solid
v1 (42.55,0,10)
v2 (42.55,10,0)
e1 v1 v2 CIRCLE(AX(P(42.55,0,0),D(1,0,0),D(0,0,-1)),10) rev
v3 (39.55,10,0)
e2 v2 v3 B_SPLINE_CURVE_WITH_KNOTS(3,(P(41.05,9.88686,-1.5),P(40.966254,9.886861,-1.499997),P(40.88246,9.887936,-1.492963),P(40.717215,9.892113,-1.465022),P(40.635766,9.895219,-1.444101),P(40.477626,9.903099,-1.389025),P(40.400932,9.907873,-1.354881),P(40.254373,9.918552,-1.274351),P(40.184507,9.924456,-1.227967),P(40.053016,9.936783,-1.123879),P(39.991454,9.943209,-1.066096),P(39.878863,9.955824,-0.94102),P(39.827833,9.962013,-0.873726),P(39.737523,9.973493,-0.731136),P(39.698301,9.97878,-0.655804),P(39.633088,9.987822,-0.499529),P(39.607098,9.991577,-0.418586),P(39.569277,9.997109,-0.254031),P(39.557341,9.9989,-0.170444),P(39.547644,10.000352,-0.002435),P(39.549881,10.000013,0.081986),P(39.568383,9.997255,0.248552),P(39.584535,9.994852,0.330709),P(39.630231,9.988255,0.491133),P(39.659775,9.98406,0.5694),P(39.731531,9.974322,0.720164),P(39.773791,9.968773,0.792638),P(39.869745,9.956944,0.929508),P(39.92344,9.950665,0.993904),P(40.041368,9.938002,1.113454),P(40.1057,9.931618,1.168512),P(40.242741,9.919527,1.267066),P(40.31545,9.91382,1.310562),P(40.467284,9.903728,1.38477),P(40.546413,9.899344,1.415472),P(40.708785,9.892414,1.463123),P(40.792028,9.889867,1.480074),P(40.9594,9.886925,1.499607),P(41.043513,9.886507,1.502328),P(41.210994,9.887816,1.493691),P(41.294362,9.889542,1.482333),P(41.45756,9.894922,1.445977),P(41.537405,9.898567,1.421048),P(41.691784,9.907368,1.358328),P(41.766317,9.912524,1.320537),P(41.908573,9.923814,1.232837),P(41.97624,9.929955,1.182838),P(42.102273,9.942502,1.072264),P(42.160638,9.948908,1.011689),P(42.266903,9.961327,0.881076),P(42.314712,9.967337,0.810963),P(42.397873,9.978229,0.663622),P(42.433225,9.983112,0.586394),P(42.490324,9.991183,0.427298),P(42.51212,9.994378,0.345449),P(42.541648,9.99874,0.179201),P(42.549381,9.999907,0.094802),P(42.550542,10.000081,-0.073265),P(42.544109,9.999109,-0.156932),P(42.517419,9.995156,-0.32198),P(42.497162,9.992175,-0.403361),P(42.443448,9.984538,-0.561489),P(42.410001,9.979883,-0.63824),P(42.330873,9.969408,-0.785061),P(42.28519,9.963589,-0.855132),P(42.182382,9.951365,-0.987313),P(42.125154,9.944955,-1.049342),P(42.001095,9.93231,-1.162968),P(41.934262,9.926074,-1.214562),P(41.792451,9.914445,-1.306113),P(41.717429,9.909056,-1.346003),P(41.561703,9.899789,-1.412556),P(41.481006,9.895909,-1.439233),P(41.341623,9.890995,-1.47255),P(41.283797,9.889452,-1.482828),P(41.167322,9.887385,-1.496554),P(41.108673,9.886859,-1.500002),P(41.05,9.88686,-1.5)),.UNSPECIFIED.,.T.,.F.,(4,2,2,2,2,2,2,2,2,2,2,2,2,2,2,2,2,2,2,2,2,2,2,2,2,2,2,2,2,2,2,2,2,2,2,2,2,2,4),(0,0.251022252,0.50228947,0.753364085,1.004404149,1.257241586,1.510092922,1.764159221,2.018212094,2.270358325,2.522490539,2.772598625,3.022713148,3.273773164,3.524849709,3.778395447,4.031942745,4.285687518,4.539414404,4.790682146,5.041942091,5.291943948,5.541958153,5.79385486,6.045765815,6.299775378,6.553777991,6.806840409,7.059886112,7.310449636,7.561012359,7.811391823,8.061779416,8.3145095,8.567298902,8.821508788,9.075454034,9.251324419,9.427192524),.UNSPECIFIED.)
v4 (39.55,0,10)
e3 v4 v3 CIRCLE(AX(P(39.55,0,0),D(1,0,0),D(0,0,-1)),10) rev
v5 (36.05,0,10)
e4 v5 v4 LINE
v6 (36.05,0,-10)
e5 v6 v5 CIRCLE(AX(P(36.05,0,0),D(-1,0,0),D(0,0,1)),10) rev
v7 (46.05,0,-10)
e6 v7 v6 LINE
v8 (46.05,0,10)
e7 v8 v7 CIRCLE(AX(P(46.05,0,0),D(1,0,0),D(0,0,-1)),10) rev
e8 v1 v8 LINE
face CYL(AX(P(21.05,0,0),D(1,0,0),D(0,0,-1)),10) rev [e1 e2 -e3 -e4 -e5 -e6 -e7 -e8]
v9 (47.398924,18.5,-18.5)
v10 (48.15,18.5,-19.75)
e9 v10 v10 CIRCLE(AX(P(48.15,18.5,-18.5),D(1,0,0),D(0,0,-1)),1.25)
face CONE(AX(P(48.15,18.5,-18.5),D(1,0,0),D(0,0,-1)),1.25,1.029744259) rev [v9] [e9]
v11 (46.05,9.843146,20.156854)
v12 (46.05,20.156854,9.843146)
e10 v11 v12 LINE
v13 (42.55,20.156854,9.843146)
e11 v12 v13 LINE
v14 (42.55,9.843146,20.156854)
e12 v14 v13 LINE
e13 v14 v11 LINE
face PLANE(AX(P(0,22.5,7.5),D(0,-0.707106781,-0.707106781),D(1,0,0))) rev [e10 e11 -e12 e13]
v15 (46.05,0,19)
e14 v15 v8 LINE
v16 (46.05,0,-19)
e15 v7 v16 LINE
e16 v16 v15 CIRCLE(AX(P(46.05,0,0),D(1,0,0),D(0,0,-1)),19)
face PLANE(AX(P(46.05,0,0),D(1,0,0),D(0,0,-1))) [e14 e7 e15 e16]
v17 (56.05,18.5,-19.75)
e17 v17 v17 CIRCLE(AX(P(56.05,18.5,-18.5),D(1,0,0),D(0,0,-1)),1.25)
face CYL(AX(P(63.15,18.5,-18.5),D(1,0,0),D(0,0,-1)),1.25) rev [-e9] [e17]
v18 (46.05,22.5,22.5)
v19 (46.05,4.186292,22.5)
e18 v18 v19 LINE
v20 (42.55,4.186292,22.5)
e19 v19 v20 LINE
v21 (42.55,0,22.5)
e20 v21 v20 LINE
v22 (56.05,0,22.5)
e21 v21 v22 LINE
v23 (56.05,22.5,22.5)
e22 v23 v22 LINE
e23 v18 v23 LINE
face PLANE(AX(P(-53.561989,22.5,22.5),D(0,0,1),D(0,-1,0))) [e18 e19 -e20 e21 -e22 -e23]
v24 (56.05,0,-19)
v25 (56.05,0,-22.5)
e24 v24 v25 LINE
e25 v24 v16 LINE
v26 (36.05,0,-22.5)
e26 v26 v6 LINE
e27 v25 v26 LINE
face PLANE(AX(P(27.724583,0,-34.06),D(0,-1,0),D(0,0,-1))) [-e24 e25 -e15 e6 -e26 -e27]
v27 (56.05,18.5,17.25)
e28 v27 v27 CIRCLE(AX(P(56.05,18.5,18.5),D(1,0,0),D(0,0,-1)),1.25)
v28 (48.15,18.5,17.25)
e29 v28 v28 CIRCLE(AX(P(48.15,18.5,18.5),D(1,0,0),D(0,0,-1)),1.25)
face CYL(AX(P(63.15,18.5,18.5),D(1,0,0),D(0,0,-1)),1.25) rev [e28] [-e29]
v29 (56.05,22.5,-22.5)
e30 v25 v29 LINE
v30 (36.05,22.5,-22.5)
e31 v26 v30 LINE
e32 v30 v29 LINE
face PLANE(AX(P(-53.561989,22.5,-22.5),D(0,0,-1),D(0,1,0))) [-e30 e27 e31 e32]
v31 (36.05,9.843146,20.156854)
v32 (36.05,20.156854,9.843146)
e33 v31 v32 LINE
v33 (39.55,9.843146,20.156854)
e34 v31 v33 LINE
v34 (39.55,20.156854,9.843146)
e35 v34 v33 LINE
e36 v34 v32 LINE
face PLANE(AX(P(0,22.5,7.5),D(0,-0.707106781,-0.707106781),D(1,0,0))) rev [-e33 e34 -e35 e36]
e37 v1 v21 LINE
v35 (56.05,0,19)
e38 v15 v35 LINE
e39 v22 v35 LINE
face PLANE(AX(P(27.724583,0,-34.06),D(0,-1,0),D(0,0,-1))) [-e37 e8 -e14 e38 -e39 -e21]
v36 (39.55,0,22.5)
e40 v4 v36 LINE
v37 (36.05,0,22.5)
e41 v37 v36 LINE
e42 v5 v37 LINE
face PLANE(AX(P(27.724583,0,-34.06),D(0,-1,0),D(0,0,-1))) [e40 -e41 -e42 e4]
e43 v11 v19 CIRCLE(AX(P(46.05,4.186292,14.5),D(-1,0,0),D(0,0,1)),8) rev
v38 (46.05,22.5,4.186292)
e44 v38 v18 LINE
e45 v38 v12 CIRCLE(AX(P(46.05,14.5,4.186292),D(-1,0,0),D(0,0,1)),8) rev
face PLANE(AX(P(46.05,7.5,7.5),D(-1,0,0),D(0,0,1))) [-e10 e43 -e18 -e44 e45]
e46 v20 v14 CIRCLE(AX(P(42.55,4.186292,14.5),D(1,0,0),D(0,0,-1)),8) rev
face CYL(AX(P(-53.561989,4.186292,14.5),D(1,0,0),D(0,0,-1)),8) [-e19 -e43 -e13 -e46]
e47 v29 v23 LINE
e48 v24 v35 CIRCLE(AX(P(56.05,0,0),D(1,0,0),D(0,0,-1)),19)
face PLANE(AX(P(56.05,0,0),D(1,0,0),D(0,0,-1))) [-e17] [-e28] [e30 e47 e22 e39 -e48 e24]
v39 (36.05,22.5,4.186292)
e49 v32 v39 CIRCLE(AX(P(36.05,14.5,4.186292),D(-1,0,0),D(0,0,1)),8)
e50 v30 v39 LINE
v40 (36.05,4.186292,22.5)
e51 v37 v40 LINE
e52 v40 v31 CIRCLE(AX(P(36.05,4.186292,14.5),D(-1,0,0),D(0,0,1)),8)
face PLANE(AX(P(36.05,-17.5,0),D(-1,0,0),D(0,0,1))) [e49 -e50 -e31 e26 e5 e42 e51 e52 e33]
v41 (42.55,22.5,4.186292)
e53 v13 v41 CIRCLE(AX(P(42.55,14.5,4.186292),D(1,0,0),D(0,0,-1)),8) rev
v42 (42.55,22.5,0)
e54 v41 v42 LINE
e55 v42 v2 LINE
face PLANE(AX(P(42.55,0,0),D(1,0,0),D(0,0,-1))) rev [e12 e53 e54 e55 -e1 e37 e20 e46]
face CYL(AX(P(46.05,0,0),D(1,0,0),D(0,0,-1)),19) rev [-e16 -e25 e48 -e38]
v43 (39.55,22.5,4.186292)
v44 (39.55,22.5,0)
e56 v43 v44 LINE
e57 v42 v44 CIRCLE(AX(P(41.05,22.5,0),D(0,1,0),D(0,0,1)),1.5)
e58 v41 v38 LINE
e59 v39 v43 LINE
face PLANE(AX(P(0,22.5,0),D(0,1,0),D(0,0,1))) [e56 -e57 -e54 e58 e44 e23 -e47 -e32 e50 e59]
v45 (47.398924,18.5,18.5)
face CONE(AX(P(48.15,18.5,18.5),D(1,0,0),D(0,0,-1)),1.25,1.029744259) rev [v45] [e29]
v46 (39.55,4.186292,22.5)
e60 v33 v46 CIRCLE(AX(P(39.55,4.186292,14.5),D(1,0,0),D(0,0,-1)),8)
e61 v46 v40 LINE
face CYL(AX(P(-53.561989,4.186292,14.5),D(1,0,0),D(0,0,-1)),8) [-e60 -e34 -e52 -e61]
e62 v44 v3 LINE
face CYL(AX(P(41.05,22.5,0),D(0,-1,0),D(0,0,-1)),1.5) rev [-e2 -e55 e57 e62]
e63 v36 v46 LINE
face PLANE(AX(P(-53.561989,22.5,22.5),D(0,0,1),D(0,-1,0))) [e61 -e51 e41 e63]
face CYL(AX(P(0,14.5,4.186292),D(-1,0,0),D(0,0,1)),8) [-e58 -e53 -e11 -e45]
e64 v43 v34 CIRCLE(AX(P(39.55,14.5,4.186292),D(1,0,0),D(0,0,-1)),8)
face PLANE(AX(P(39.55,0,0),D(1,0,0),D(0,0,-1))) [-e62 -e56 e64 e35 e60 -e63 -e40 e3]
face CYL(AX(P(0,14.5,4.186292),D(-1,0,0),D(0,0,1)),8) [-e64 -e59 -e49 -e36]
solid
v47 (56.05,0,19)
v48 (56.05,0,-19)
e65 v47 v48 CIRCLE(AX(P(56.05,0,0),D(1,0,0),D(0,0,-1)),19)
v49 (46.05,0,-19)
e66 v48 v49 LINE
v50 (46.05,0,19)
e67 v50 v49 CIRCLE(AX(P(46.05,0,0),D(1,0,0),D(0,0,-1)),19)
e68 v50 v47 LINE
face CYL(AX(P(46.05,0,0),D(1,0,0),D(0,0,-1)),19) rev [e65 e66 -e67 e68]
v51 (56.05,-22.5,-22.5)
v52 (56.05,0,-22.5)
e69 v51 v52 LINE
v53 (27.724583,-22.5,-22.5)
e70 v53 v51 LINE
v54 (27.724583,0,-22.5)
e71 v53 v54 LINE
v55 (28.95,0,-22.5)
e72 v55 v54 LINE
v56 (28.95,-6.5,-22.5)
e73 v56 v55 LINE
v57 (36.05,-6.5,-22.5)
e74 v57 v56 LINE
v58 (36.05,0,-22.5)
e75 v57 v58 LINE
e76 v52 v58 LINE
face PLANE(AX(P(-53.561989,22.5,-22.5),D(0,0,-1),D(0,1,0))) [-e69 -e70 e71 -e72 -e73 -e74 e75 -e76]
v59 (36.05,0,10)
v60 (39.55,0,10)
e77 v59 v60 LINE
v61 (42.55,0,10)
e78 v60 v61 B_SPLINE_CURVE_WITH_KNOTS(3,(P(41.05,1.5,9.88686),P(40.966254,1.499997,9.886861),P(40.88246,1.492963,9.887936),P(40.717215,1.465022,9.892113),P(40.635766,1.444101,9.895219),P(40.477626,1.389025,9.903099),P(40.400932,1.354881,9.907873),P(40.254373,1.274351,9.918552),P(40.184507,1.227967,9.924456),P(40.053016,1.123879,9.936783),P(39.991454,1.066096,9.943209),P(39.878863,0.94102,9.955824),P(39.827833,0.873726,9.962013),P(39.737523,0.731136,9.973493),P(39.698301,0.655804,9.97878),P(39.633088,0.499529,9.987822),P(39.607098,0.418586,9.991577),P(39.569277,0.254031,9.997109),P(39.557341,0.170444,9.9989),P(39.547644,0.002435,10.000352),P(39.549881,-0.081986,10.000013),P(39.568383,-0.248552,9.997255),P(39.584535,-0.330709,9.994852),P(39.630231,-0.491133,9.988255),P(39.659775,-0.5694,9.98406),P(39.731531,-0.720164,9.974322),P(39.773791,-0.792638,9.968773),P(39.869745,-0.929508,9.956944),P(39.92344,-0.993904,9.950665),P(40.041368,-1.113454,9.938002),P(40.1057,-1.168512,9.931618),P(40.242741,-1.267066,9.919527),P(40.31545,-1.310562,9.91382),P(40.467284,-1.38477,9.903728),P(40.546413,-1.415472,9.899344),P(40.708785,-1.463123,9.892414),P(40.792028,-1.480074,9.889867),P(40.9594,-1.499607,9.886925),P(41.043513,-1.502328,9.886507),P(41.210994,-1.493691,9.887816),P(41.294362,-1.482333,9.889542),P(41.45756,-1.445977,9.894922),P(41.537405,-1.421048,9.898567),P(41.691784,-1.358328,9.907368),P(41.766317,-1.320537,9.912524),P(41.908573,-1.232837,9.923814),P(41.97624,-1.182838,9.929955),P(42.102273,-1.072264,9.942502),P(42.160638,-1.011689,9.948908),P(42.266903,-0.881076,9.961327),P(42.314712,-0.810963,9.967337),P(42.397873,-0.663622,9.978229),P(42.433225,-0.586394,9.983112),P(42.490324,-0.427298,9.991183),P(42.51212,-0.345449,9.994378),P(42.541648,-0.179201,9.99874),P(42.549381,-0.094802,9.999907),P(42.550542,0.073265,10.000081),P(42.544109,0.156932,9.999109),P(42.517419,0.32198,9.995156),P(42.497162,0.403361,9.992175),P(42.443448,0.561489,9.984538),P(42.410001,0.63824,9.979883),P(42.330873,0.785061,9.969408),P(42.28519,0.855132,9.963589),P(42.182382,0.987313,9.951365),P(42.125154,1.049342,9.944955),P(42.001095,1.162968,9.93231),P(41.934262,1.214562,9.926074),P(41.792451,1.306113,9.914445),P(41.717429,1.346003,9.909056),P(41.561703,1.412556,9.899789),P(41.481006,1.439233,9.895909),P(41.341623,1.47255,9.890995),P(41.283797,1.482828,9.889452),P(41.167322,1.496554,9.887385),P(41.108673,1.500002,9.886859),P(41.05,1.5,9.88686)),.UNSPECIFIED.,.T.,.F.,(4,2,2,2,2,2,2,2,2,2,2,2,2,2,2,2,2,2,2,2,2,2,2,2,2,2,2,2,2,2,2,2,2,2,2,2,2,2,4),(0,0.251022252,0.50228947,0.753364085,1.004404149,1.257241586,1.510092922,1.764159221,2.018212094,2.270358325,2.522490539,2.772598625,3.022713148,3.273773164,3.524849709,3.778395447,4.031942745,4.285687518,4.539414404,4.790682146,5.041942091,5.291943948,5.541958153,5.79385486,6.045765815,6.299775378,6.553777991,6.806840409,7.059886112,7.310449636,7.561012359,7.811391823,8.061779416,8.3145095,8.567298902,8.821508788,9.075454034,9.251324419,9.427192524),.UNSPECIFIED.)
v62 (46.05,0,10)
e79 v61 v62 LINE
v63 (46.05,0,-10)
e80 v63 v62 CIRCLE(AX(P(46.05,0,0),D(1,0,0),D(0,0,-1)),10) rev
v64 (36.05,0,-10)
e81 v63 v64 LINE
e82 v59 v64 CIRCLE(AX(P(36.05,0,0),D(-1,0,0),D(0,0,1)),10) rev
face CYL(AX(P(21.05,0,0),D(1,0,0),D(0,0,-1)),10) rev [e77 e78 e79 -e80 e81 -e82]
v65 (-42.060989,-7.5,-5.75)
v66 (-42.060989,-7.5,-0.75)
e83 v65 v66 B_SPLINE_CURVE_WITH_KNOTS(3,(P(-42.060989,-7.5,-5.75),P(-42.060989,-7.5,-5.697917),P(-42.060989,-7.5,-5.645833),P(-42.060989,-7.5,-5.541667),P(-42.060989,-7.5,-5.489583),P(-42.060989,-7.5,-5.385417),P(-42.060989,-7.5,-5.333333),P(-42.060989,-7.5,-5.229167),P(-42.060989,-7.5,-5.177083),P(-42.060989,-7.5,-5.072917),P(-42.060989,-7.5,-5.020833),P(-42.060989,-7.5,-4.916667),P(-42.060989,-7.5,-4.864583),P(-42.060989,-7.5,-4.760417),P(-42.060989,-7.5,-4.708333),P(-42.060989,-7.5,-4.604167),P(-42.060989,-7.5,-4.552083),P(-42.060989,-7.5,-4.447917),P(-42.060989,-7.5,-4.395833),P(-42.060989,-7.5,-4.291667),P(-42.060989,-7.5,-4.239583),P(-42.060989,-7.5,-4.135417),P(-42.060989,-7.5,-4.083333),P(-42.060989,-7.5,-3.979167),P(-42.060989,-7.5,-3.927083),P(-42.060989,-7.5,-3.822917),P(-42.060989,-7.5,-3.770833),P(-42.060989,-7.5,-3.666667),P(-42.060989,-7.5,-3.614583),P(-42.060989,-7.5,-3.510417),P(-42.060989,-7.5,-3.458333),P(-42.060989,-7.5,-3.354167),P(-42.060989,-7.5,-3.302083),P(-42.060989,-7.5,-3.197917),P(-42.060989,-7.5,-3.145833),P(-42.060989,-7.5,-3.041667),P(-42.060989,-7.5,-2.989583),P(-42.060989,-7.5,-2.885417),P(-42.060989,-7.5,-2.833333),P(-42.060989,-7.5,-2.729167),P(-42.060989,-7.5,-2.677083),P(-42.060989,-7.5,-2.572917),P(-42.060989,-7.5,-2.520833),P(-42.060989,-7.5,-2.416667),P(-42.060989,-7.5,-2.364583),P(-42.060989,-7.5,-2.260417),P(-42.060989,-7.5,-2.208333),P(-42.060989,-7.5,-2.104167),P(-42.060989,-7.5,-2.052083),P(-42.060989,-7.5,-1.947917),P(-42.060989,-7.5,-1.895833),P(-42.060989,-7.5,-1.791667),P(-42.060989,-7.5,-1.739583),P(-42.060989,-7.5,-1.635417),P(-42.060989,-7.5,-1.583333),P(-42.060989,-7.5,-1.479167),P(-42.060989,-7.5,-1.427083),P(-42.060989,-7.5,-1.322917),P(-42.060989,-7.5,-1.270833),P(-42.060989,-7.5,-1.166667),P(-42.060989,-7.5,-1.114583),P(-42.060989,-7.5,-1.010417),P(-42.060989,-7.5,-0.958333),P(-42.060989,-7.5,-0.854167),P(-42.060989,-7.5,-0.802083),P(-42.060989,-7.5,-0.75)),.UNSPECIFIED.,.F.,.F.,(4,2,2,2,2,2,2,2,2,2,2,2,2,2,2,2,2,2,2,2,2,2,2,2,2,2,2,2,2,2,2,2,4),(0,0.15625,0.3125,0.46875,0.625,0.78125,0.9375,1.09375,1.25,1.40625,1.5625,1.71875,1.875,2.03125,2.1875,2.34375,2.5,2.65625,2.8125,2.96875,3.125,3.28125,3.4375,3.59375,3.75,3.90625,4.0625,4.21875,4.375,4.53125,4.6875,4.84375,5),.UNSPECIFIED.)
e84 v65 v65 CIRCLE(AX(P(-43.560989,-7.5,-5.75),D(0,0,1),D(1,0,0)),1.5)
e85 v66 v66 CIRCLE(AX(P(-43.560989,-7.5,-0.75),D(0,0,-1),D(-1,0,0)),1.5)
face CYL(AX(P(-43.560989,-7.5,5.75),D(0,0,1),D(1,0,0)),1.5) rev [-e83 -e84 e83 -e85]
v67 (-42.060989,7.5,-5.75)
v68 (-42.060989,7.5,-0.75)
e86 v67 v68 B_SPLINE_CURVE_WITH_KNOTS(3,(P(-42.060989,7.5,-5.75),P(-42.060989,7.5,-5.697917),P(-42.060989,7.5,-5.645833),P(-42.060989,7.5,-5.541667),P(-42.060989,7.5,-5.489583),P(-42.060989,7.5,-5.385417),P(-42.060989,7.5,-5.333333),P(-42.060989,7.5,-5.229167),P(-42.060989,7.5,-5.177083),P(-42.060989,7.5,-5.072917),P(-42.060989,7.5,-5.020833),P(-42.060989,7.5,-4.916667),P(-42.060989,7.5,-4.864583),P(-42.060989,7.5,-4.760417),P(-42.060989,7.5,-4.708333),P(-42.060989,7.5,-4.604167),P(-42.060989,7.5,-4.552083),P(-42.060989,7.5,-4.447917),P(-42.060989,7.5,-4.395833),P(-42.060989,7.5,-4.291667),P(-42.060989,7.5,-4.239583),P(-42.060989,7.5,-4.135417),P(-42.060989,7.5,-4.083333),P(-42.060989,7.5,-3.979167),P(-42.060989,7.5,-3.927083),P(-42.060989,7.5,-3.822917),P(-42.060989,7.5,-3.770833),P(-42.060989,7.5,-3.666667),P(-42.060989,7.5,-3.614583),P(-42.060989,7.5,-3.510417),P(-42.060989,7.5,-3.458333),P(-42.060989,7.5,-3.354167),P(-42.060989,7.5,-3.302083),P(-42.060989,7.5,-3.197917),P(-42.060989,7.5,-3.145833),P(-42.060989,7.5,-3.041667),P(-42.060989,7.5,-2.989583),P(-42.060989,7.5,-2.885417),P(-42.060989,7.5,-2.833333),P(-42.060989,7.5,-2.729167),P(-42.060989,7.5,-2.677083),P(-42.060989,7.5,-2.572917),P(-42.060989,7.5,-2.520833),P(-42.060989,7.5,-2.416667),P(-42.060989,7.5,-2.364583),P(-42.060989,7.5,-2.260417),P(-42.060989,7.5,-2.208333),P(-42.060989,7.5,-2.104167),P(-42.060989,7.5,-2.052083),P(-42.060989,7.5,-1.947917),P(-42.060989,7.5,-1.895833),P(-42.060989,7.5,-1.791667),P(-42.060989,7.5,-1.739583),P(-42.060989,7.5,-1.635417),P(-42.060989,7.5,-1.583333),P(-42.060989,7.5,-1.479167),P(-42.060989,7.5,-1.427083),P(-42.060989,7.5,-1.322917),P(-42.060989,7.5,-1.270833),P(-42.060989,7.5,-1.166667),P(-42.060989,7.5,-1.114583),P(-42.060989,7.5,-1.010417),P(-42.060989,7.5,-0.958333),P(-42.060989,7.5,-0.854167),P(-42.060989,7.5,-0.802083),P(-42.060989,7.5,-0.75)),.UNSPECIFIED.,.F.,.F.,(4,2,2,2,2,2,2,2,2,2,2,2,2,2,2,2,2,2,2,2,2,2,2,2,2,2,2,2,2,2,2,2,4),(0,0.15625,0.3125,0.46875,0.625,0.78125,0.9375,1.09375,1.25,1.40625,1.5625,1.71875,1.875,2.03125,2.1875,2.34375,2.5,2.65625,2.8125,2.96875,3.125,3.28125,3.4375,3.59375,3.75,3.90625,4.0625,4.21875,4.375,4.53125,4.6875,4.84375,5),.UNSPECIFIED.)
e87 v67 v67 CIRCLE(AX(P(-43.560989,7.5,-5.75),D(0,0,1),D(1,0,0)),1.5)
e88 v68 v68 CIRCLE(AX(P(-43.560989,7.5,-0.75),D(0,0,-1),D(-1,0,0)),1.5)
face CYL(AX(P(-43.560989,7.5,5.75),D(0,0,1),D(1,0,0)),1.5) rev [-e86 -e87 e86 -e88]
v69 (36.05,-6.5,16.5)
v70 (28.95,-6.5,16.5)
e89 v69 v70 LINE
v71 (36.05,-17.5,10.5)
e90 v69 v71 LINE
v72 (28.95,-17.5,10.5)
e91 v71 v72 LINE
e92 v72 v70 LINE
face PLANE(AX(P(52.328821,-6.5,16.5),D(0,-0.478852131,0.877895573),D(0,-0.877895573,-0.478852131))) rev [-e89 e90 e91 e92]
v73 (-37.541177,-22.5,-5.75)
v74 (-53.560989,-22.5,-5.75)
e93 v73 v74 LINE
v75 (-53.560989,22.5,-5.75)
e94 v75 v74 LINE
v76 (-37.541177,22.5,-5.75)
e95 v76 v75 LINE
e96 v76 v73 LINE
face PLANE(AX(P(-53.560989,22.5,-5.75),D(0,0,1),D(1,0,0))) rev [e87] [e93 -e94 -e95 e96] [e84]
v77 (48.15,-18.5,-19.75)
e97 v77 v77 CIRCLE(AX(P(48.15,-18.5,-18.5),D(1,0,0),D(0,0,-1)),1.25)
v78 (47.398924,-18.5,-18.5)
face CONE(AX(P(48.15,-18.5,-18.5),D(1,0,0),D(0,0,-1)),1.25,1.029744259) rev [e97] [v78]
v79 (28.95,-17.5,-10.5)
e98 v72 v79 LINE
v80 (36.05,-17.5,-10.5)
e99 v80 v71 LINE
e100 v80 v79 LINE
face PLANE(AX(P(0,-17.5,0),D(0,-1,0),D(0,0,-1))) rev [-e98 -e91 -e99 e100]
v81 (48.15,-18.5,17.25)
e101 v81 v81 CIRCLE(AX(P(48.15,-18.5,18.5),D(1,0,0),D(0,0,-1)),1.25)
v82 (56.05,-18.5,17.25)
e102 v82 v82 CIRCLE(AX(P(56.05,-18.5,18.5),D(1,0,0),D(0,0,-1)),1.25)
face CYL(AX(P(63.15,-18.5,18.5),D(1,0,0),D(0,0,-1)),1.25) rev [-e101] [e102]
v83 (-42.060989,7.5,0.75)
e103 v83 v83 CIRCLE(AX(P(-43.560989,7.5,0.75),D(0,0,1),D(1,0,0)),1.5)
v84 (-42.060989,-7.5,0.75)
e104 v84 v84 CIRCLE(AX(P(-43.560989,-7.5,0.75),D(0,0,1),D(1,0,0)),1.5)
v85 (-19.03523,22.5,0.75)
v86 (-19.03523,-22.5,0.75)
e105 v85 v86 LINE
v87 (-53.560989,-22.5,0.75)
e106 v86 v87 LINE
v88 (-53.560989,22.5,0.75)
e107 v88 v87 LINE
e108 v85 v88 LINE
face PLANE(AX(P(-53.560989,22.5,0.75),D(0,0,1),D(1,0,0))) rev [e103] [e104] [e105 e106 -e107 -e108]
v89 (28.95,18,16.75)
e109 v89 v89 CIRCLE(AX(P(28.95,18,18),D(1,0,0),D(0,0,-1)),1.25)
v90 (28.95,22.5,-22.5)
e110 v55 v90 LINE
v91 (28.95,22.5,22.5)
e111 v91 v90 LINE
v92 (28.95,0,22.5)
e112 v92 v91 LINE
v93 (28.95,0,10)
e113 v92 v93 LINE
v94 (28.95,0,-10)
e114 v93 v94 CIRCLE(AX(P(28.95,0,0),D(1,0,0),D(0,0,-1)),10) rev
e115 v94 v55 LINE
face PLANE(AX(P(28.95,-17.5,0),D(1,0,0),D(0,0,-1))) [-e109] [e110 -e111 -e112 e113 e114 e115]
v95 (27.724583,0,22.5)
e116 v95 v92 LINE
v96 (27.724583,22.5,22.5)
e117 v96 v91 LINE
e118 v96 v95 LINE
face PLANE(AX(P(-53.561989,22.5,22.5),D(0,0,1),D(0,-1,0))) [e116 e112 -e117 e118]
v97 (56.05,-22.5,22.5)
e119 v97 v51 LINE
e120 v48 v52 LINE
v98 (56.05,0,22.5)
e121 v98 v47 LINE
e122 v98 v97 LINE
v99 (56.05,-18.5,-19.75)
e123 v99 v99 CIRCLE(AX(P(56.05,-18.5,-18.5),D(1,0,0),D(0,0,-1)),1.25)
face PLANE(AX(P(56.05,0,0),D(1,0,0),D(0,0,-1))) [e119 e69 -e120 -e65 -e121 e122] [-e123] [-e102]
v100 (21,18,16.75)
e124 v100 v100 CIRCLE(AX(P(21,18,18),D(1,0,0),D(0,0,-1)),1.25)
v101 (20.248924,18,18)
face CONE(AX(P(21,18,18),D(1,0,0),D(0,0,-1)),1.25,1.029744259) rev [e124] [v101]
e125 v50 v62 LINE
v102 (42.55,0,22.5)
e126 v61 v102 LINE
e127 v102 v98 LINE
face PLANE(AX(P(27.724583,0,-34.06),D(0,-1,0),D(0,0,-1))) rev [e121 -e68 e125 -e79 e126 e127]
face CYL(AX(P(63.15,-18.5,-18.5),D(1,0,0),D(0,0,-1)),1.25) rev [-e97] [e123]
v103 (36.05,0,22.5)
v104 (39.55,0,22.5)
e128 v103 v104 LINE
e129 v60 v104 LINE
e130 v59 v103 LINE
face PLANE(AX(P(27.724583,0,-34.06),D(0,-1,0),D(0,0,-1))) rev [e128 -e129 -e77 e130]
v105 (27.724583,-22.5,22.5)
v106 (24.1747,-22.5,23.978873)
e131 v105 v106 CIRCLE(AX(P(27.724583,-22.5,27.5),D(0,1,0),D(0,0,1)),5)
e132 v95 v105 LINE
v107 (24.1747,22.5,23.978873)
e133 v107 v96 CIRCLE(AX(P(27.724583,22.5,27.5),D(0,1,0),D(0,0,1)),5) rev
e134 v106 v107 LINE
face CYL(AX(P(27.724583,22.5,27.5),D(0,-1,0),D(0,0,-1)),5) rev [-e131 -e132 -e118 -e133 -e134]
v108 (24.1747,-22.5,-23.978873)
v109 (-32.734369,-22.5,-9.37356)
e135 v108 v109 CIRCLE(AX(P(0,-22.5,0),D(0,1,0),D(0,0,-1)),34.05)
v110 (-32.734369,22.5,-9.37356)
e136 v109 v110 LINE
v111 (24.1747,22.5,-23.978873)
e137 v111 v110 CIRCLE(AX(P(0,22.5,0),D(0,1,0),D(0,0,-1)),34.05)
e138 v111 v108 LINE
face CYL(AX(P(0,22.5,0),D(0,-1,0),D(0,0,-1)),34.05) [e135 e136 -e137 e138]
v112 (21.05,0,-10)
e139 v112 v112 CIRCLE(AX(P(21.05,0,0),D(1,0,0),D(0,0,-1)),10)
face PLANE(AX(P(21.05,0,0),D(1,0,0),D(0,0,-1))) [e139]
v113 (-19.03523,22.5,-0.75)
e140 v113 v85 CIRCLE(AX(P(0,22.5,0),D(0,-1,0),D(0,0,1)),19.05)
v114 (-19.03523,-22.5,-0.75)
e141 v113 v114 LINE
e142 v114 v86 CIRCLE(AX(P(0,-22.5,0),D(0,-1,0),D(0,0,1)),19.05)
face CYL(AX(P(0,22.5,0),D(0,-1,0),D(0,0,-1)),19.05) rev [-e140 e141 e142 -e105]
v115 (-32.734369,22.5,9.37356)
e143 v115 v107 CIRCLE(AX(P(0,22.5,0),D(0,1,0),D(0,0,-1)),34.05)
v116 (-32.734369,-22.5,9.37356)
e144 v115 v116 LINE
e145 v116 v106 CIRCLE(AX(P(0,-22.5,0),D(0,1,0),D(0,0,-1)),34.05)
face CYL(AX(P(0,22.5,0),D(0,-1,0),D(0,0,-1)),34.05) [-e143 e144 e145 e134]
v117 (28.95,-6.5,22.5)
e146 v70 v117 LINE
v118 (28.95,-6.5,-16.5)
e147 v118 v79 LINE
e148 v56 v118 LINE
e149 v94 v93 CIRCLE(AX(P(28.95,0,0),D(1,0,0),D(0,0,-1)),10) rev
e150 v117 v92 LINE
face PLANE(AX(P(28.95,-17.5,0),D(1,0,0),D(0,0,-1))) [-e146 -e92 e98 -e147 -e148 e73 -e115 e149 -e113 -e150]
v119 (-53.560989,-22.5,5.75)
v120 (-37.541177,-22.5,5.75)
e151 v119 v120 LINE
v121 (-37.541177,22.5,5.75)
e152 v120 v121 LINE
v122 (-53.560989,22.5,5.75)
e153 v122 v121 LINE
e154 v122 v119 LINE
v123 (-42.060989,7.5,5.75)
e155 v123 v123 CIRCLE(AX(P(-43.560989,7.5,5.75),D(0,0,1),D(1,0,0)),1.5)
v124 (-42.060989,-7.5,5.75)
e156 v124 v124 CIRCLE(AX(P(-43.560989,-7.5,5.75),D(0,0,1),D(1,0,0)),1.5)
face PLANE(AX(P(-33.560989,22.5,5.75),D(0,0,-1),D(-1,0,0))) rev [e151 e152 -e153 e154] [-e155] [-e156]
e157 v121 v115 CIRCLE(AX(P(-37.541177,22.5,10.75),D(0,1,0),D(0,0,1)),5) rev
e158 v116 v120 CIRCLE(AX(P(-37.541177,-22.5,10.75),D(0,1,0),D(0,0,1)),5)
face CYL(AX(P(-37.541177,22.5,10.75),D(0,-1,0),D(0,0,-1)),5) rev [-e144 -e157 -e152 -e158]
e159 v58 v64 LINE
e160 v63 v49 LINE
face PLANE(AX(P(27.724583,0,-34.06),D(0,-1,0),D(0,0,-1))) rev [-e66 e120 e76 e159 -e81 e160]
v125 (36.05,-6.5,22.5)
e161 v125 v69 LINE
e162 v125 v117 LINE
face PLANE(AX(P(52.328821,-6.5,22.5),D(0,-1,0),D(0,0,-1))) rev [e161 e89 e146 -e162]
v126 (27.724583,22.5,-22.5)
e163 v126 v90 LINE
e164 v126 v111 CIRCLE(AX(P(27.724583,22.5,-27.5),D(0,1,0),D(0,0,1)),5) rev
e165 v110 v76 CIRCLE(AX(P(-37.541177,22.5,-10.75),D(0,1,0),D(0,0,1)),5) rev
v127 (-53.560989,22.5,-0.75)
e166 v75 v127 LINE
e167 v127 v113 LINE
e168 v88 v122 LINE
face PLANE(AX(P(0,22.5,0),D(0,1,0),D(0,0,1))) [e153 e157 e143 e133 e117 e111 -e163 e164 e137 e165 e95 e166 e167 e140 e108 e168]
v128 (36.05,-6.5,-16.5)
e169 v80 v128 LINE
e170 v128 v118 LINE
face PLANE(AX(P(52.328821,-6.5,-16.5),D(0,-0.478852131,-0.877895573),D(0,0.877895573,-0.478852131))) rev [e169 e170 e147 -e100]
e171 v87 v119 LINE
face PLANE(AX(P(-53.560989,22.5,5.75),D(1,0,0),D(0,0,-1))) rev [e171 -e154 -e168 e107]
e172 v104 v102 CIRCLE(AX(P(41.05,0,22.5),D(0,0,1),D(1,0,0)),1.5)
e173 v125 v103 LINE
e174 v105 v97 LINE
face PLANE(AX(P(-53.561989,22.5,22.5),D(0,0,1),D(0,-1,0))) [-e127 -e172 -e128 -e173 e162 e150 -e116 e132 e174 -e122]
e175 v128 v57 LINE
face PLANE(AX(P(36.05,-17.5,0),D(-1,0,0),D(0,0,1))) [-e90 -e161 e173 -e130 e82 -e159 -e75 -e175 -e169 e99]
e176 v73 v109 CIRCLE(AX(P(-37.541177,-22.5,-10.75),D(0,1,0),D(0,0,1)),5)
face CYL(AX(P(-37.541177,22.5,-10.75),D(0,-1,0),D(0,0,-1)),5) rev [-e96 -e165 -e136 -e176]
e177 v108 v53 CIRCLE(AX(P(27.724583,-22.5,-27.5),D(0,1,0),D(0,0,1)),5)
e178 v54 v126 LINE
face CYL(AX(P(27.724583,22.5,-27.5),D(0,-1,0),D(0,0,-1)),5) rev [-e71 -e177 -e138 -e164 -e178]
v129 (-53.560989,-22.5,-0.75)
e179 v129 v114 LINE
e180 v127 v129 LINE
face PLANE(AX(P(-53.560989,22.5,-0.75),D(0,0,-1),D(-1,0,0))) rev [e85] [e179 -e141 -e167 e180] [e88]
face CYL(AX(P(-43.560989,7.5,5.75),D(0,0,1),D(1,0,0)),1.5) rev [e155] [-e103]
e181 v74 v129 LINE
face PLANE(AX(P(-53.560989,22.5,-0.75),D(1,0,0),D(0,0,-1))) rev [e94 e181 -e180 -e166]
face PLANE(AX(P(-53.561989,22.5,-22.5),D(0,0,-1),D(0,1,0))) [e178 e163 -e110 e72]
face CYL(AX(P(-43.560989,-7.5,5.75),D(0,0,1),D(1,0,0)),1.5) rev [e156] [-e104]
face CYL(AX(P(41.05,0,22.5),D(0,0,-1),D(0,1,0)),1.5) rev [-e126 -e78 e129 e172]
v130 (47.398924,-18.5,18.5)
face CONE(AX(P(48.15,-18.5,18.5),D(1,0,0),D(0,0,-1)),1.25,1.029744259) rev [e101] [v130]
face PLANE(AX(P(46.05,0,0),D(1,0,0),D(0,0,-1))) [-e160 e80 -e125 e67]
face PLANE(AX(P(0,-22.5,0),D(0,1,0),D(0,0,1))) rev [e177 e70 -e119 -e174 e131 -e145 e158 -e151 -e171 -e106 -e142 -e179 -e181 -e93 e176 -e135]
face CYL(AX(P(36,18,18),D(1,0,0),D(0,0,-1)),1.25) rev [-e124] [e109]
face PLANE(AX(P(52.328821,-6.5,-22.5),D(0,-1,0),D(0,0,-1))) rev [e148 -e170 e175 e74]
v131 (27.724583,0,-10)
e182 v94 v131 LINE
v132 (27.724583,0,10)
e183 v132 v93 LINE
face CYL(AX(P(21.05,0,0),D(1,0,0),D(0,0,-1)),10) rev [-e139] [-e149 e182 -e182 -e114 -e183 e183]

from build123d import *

# Parameters (mm, degrees)
BOSS_EXTRUDE1_DEPTH       = 22.5
F_3_0MM_DOWEL_HOLE1_D     = 3
BOSS_EXTRUDE2_START       = -8.493151603
BOSS_EXTRUDE2_OUTLINE_W   = 45
BOSS_EXTRUDE2_OUTLINE_H   = 45
BOSS_EXTRUDE2_DEPTH       = 30.493151603
SKETCH5_R                 = 10
CUT_EXTRUDE1_DEPTH        = 35
SKETCH16_R                = 19
CUT_EXTRUDE9_DEPTH        = 10
CUT_EXTRUDE2_START        = 22.5
SKETCH7_W                 = 7.1
SKETCH7_H                 = 45
CUT_EXTRUDE2_DEPTH        = 40
SKETCH8_W                 = 22.5
SKETCH8_H                 = 22.5
CUT_EXTRUDE3_DEPTH        = 1.5
CUT_EXTRUDE5_OUTLINE_W    = 1.5
CUT_EXTRUDE5_OUTLINE_H    = 12.613186919
CUT_EXTRUDE8_START        = 9
CUT_EXTRUDE8_DEPTH        = 14
CHAMFER1_START            = 36.05
CHAMFER1_DEPTH            = 10
FILLET3_R                 = 5
FILLET4_R                 = 8
BOSS_EXTRUDE3_DEPTH       = 7.1
M3X0_5_TAPPED_HOLE1_D     = 2.5
M3X0_5_TAPPED_HOLE1_DEPTH = 15
M3X0_5_TAPPED_HOLE1_TIP   = 0.751075774
SPLIT1_START              = 36.05
SPLIT1_2_DEPTH            = 10
SPLIT1_START_2            = 46.05
SPLIT1_3_OUTLINE_R        = 1.25
SPLIT1_3_DEPTH            = 10
SPLIT1_4_OUTLINE_R        = 1.25
SPLIT1_4_DEPTH            = 1.348924226
SPLIT1_START_3            = 47.398924226
SPLIT1_5_OUTLINE_R        = 1.25
SPLIT1_5_DEPTH            = 0.751075674
SPLIT1_6_DEPTH            = 22.5
SPLIT1_8_DEPTH            = 22.5


with BuildPart() as part:
    # Sketch3 → Boss-Extrude1 (new, symmetric)
    with BuildSketch(Plane(origin=(0, 0, 0), x_dir=(1, 0, 0), z_dir=(0, 1, 0))):
        with BuildLine():
            Line((-53.560989258, 0.75), (-53.560989258, 5.75))
            Line((-53.560989258, 5.75), (-33.560989258, 5.75))
            ThreePointArc((-33.560989258, 5.75), (34.05, 0), (-33.560989258, -5.75))
            Line((-33.560989258, -5.75), (-53.560989258, -5.75))
            Line((-53.560989258, -5.75), (-53.560989258, -0.75))
            Line((-53.560989258, -0.75), (-19.035230495, -0.75))
            ThreePointArc((-19.035230495, -0.75), (19.05, 0), (-19.035230495, 0.75))
            Line((-19.035230495, 0.75), (-53.560989258, 0.75))
        make_face()
    extrude(amount=BOSS_EXTRUDE1_DEPTH, both=True)

    # Ø3.0mm Dowel Hole1 (through all)
    with Locations(Plane.XY.offset(5.75)):
        with Locations((-43.560989258, 7.5), (-43.560989258, -7.5)):
            Hole(F_3_0MM_DOWEL_HOLE1_D / 2)

    # Boss-Extrude2: read off the stored shape, not the designer's step
    # Boss-Extrude2 outline → Boss-Extrude2 (add)
    with BuildSketch(Plane(origin=(34.05, 0, 0), x_dir=(0, 0, -1), z_dir=(1, 0, 0)).offset(BOSS_EXTRUDE2_START)):
        Rectangle(BOSS_EXTRUDE2_OUTLINE_W, BOSS_EXTRUDE2_OUTLINE_H)
    extrude(amount=BOSS_EXTRUDE2_DEPTH)

    # Sketch5 → Cut-Extrude1 (cut)
    with BuildSketch(Plane(origin=(56.05, 0, 0), x_dir=(0, 0, -1), z_dir=(1, 0, 0))):
        Circle(SKETCH5_R)
    extrude(amount=-CUT_EXTRUDE1_DEPTH, mode=Mode.SUBTRACT)

    # Sketch16 → Cut-Extrude9 (cut)
    with BuildSketch(Plane(origin=(56.05, 0, 0), x_dir=(0, 0, -1), z_dir=(1, 0, 0))):
        Circle(SKETCH16_R)
    extrude(amount=-CUT_EXTRUDE9_DEPTH, mode=Mode.SUBTRACT)

    # Sketch7 → Cut-Extrude2 (cut)
    with BuildSketch(Plane(origin=(0, 0, 0), x_dir=(1, 0, 0), z_dir=(0, 1, 0)).offset(CUT_EXTRUDE2_START)):
        with Locations((32.5, 0)):
            Rectangle(SKETCH7_W, SKETCH7_H)
    extrude(amount=-CUT_EXTRUDE2_DEPTH, mode=Mode.SUBTRACT)

    # Sketch8 → Cut-Extrude3 (cut, symmetric)
    with BuildSketch(Plane.ZY.offset(-41.05)):
        with Locations((11.25, 11.25)):
            Rectangle(SKETCH8_W, SKETCH8_H)
    extrude(amount=CUT_EXTRUDE3_DEPTH, both=True, mode=Mode.SUBTRACT)

    # Cut-Extrude5: read off the stored shape, not the designer's step
    # Cut-Extrude5 outline → Cut-Extrude5 (revolve, cut)
    with BuildSketch(Plane(origin=(41.05, 0, 0), x_dir=(1, 0, 0), z_dir=(0, -1, 0))):
        with Locations((0.75, 16.19340654)):
            Rectangle(CUT_EXTRUDE5_OUTLINE_W, CUT_EXTRUDE5_OUTLINE_H)
    revolve(axis=Axis((41.05, 0, 0), (0, 0, 1)), mode=Mode.SUBTRACT)

    # Cut-Extrude8: read off the stored shape, not the designer's step
    # Cut-Extrude8 outline → Cut-Extrude8 (cut)
    with BuildSketch(Plane(origin=(0, 0, 0), x_dir=(1, 0, 0), z_dir=(0, 1, 0)).offset(CUT_EXTRUDE8_START)):
        with BuildLine():
            ThreePointArc((42.55, 0), (41.05, 1.5), (39.55, 0))
            Line((39.55, 0), (42.55, 0))
        make_face()
    extrude(amount=CUT_EXTRUDE8_DEPTH, mode=Mode.SUBTRACT)

    # Chamfer1: read off the stored shape, not the designer's step
    # Chamfer1 outline → Chamfer1 (cut)
    with BuildSketch(Plane.YZ.offset(CHAMFER1_START)):
        Polygon((22.5, 22.5), (7.5, 22.5), (22.5, 7.5), align=None)
    extrude(amount=CHAMFER1_DEPTH, mode=Mode.SUBTRACT)

    # Fillet3
    fillet3_edges = [part.edges().sort_by_distance(p)[0] for p in [
        (-33.560989258, 0, -5.75),
        (-33.560989258, 0, 5.75),
        (25.556848397, 0, -22.5),
        (25.556848397, 0, 22.5),
    ]]
    fillet(fillet3_edges, radius=FILLET3_R)

    # Fillet4
    fillet4_edges = [part.edges().sort_by_distance(p)[0] for p in [
        (37.8, 22.5, 7.5),
        (44.3, 22.5, 7.5),
        (37.8, 7.5, 22.5),
        (44.3, 7.5, 22.5),
    ]]
    fillet(fillet4_edges, radius=FILLET4_R)

    # Sketch15 → Boss-Extrude3 (add)
    with BuildSketch(Plane(origin=(28.95, 0, 0), x_dir=(0, 0, -1), z_dir=(1, 0, 0))):
        Polygon((-22.5, -6.5), (-16.5, -6.5), (-10.5, -17.5), (-22.5, -17.5), align=None)
        Polygon((22.5, -6.5), (16.5, -6.5), (10.5, -17.5), (22.5, -17.5), align=None)
    extrude(amount=BOSS_EXTRUDE3_DEPTH)

    # M3x0.5 Tapped Hole1
    with Locations(Plane(origin=(63.15, 0, 0), x_dir=(0, 0, -1), z_dir=(1, 0, 0))):
        with Locations((-18.5, 18.5), (-18.5, -18.5), (18.5, -18.5), (18.5, 18.5)):
            Hole(M3X0_5_TAPPED_HOLE1_D / 2, depth=M3X0_5_TAPPED_HOLE1_DEPTH)
            with Locations((0, 0, -(M3X0_5_TAPPED_HOLE1_DEPTH + M3X0_5_TAPPED_HOLE1_TIP / 2))):  # 118° drill point
                Cone(0, M3X0_5_TAPPED_HOLE1_D / 2, M3X0_5_TAPPED_HOLE1_TIP, mode=Mode.SUBTRACT)

    # Sketch20 → M3x0.5 Tapped Hole2 (revolve, cut)
    with BuildSketch(Plane(origin=(36, 18, 18), x_dir=(0, 0, -1), z_dir=(0, 1, 0))):
        Polygon((0, 0), (0, 15.751075774), (1.25, 15), (1.25, 0), align=None)
    revolve(axis=Axis((42.35, 18, 18), (-1, 0, 0)), mode=Mode.SUBTRACT)

    # Split1 8 outline → Split1 8 (cut)
    with BuildSketch(Plane(origin=(0, 0, 0), x_dir=(1, 0, 0), z_dir=(0, 1, 0))):
        with BuildLine():
            Line((36.05, 22.5), (36.05, -22.5))
            Line((36.05, -22.5), (39.55, -22.5))
            Line((39.55, -22.5), (39.55, 0))
            ThreePointArc((39.55, 0), (41.05, 1.5), (42.55, 0))
            Line((42.55, 0), (42.55, -22.5))
            Line((42.55, -22.5), (56.05, -22.5))
            Line((56.05, -22.5), (56.05, 22.5))
            Line((56.05, 22.5), (36.05, 22.5))
        make_face()
    extrude(amount=SPLIT1_8_DEPTH, mode=Mode.SUBTRACT)


with BuildPart() as body_2:
    # Split1: read off the stored shape, not the designer's step
    # Split1 outline → Split1 (revolve)
    with BuildSketch(Plane(origin=(0, 18.5, -18.5), x_dir=(0, 1, 0), z_dir=(0, 0, -1))):
        Polygon((1.25, 48.15), (0, 47.398924226), (1.25, 47.398924226), align=None)
    revolve(axis=Axis((0, 18.5, -18.5), (1, 0, 0)))

    # Split1 2 outline → Split1 2 (add)
    with BuildSketch(Plane.YZ.offset(SPLIT1_START)):
        with BuildLine():
            ThreePointArc((0, 10), (10, 0), (0, -10))
            Line((0, -10), (0, -22.5))
            Line((0, -22.5), (22.5, -22.5))
            Line((22.5, -22.5), (22.5, 4.186291501))
            ThreePointArc((22.5, 4.186291501), (21.89103626, 7.24775896), (20.156854249, 9.843145751))
            Line((20.156854249, 9.843145751), (9.843145751, 20.156854249))
            ThreePointArc((9.843145751, 20.156854249), (7.24775896, 21.89103626), (4.186291501, 22.5))
            Line((4.186291501, 22.5), (0, 22.5))
            Line((0, 22.5), (0, 10))
        make_face()
    extrude(amount=SPLIT1_2_DEPTH)

    # Split1 3 outline → Split1 3 (add)
    with BuildSketch(Plane.YZ.offset(SPLIT1_START_2)):
        with BuildLine():
            ThreePointArc((0, 19), (19, 0), (0, -19))
            Line((0, -19), (0, -22.5))
            Line((0, -22.5), (22.5, -22.5))
            Line((22.5, -22.5), (22.5, 22.5))
            Line((22.5, 22.5), (0, 22.5))
            Line((0, 22.5), (0, 19))
        make_face()
        with Locations((18.5, -18.5)):
            Circle(SPLIT1_3_OUTLINE_R, mode=Mode.SUBTRACT)
        with Locations((18.5, 18.5)):
            Circle(SPLIT1_3_OUTLINE_R, mode=Mode.SUBTRACT)
    extrude(amount=SPLIT1_3_DEPTH)

    # Split1 4 outline → Split1 4 (add)
    with BuildSketch(Plane.YZ.offset(SPLIT1_START_2)):
        with Locations((18.5, 18.5)):
            Circle(SPLIT1_4_OUTLINE_R)
        with Locations((18.5, -18.5)):
            Circle(SPLIT1_4_OUTLINE_R)
    extrude(amount=SPLIT1_4_DEPTH)

    # Split1 5 outline → Split1 5 (add)
    with BuildSketch(Plane.YZ.offset(SPLIT1_START_3)):
        with Locations((18.5, 18.5)):
            Circle(SPLIT1_5_OUTLINE_R)
    extrude(amount=SPLIT1_5_DEPTH)

    # Split1 6 outline → Split1 6 (cut)
    with BuildSketch(Plane(origin=(0, 0, 0), x_dir=(1, 0, 0), z_dir=(0, 1, 0))):
        with BuildLine():
            ThreePointArc((42.55, 0), (41.05, 1.5), (39.55, 0))
            Line((39.55, 0), (39.55, -22.5))
            Line((39.55, -22.5), (42.55, -22.5))
            Line((42.55, -22.5), (42.55, 0))
        make_face()
    extrude(amount=SPLIT1_6_DEPTH, mode=Mode.SUBTRACT)

    # Split1 7 outline → Split1 7 (revolve, cut)
    with BuildSketch(Plane(origin=(0, 18.5, 18.5), x_dir=(0, 1, 0), z_dir=(0, 0, -1))):
        Polygon((0, 48.15), (0, 47.398924226), (1.25, 48.15), align=None)
    revolve(axis=Axis((0, 18.5, 18.5), (1, 0, 0)), mode=Mode.SUBTRACT)


solid = Compound([part.part, body_2.part])
